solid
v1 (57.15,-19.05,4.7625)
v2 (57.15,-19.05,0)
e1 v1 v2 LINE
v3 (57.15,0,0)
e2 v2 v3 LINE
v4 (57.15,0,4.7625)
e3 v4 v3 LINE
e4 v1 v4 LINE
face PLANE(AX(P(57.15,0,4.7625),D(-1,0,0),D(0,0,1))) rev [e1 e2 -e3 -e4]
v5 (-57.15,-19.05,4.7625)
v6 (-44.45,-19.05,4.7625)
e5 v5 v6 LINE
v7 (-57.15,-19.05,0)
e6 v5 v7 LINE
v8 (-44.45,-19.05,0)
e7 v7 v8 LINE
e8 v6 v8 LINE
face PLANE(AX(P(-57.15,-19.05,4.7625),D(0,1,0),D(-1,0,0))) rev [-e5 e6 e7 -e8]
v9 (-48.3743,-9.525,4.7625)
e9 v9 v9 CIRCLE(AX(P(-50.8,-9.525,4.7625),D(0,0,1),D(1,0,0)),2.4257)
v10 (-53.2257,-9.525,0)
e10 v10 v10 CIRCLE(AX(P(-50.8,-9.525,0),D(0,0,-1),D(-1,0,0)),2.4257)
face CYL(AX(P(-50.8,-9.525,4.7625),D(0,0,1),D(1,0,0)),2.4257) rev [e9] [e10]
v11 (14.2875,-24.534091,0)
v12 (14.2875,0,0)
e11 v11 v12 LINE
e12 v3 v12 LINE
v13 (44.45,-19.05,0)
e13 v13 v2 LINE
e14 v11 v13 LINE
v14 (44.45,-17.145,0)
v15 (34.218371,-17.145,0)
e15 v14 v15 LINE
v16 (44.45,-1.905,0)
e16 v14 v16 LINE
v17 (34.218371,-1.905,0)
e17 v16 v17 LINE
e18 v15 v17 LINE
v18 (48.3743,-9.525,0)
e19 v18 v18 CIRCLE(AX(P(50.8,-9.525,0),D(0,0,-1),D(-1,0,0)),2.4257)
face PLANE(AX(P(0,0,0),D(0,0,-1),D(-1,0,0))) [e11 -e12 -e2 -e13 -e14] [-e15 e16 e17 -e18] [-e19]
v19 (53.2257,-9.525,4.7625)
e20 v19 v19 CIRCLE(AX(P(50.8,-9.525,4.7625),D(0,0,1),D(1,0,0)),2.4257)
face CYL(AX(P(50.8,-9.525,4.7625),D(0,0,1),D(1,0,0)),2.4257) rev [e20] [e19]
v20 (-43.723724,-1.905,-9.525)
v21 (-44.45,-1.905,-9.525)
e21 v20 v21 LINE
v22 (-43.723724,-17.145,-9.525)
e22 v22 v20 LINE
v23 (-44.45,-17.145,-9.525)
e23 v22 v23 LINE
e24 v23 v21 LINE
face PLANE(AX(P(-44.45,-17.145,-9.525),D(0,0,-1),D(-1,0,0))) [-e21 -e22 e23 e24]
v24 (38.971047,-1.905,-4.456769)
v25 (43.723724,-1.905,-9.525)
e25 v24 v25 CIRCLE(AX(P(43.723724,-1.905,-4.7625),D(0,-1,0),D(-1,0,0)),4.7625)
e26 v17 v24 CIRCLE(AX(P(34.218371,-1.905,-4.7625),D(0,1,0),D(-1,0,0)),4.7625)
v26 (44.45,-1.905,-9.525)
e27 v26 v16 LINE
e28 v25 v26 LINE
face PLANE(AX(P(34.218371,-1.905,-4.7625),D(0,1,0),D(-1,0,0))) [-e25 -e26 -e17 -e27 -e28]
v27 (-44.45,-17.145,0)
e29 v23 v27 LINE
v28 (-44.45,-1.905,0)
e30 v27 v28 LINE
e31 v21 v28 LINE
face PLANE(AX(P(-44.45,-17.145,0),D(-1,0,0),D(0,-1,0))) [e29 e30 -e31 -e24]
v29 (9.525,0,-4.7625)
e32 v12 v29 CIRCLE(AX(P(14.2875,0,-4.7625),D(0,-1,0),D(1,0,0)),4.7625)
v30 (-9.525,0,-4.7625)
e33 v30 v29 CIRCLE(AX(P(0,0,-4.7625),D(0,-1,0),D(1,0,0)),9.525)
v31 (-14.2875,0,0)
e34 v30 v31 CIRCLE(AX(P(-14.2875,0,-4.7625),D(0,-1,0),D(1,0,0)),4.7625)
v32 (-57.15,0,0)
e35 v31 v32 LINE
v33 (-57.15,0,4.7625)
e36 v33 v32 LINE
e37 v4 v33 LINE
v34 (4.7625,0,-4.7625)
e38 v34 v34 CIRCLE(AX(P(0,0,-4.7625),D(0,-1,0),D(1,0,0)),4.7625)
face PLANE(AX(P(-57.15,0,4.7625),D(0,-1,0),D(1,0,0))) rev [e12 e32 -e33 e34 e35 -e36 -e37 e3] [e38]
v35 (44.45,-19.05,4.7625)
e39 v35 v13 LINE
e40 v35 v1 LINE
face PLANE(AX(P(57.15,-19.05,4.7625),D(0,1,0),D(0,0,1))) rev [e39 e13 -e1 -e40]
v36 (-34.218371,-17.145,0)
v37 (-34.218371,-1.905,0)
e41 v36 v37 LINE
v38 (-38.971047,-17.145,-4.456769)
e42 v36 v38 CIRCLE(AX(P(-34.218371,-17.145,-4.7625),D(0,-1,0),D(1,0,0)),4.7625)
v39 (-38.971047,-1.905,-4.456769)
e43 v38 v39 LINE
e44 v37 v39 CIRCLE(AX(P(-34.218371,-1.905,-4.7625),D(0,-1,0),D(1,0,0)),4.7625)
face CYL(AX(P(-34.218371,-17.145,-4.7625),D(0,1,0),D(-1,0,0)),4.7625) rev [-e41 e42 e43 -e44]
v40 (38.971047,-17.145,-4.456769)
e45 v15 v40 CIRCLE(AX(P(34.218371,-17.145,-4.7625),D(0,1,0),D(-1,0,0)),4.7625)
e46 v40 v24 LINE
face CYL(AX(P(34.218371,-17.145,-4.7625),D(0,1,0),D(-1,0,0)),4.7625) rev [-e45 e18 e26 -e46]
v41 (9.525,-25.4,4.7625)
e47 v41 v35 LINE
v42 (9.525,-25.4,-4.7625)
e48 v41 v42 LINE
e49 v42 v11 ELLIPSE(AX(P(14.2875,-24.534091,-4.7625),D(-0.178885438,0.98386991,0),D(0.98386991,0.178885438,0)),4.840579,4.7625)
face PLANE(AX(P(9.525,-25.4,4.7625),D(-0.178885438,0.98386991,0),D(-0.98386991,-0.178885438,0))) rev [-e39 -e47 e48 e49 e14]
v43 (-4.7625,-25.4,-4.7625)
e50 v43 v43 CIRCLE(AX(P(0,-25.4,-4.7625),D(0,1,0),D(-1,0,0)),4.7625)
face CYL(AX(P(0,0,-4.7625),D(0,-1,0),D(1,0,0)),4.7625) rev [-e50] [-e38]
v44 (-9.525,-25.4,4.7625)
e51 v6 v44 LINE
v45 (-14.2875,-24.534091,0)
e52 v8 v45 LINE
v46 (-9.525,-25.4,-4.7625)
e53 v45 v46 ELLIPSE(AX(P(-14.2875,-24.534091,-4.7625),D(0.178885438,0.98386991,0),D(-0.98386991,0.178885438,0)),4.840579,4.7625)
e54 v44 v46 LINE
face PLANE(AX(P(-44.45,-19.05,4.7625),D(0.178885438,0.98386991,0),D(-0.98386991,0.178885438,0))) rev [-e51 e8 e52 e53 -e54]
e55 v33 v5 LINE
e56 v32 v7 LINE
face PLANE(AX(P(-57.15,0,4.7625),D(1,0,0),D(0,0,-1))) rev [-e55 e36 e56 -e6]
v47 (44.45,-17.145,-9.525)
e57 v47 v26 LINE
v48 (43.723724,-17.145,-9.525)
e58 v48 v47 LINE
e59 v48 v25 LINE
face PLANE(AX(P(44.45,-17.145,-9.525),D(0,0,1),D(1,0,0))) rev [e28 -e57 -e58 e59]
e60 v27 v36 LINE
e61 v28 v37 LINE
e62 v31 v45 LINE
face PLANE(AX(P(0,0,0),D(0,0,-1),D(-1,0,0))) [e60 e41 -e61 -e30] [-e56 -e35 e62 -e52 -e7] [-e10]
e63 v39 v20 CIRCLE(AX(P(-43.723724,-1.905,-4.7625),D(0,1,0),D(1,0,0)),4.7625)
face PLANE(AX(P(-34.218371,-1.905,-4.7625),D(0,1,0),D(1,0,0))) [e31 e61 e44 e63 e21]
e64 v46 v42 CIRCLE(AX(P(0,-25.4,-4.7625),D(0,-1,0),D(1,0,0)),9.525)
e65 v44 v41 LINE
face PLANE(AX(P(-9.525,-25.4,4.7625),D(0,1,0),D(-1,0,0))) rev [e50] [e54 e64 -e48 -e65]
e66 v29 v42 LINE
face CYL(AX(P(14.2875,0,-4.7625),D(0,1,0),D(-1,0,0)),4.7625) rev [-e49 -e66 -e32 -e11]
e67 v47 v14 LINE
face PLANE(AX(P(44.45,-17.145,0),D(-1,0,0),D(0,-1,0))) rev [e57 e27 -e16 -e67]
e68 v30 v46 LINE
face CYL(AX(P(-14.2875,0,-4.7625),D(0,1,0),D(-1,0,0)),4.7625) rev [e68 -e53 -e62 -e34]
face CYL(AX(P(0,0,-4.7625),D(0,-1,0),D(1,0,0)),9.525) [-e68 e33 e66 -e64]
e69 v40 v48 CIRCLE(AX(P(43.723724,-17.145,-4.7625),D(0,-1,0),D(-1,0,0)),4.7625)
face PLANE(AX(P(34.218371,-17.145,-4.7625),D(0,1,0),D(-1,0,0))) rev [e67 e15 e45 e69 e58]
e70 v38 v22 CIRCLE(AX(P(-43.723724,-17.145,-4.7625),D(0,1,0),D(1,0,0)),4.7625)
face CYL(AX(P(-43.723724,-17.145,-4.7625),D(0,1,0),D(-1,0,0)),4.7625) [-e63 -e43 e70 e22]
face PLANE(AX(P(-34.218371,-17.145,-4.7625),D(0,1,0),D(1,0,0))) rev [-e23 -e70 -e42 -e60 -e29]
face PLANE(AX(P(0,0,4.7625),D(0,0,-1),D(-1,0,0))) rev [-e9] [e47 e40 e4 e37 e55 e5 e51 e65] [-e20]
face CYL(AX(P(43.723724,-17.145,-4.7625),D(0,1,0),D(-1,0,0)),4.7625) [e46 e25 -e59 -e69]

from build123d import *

# Parameters (mm, degrees)
BOSS_EXTRUDE5_DEPTH         = 4.7625
F_11_0_191_DIAMETER_HOLE1_D = 4.8514
BOSS_EXTRUDE6_DEPTH         = 25.4
CUT_EXTRUDE1_DEPTH          = 65.15150159
CUT_EXTRUDE1_DEPTH_BACK     = 65.15150159
SKETCH7_R                   = 4.7625
FILLET2_R                   = 4.7625
BOSS_EXTRUDE7_DEPTH         = 7.62


with BuildPart() as part:
    # Sketch3 → Boss-Extrude5 (new body)
    with BuildSketch(Plane.XY):
        Polygon((-57.15, 0), (57.15, 0), (57.15, -19.05), (44.45, -19.05), (9.525, -25.4), (-9.525, -25.4), (-44.45, -19.05), (-57.15, -19.05), align=None)
    extrude(amount=BOSS_EXTRUDE5_DEPTH)

    # #11 (0.191) Diameter Hole1 (through all)
    with Locations(Plane(origin=(50.8, -9.525, 4.7625), x_dir=(1, 0, 0), z_dir=(0, 0, 1))):
        with Locations((0, 0), (-101.6, 0)):
            Hole(F_11_0_191_DIAMETER_HOLE1_D / 2)

    # Sketch6 → Boss-Extrude6 (add)
    with BuildSketch(Plane.XZ.offset(25.4)):
        with BuildLine():
            Line((9.525, 0), (9.525, -4.7625))
            ThreePointArc((9.525, -4.7625), (0, -14.2875), (-9.525, -4.7625))
            Line((-9.525, -4.7625), (-9.525, 0))
            Line((-9.525, 0), (9.525, 0))
        make_face()
    extrude(amount=-BOSS_EXTRUDE6_DEPTH)

    # Sketch7 → Cut-Extrude1 (cut, two sides: drawn at the far end of the back side and taken through both)
    with BuildSketch(Plane.XZ.offset(25.4).offset(-CUT_EXTRUDE1_DEPTH_BACK)):
        with Locations((0, -4.7625)):
            Circle(SKETCH7_R)
    extrude(amount=CUT_EXTRUDE1_DEPTH + CUT_EXTRUDE1_DEPTH_BACK, mode=Mode.SUBTRACT)

    # Fillet2
    fillet2_edges = [part.edges().sort_by_distance(p)[0] for p in [
        (-9.525, -12.7, 0),
        (9.525, -12.7, 0),
    ]]
    fillet(fillet2_edges, radius=FILLET2_R - 0.0001)  # a hair under: the kernel refuses the full size

    # Sketch8 → Boss-Extrude7 (add, symmetric)
    with BuildSketch(Plane(origin=(0, -9.525, 0), x_dir=(-1, 0, 0), z_dir=(0, -1, 0))):
        with BuildLine():
            Line((-44.45, 0), (-44.45, 9.525))
            Line((-44.45, 9.525), (-43.723723681, 9.525))
            ThreePointArc((-43.723723681, 9.525), (-40.249716578, 8.02021099), (-38.971047095, 4.45676888))
            ThreePointArc((-38.971047095, 4.45676888), (-37.476081499, 1.288492897), (-34.218370509, 0))
            Line((-34.218370509, 0), (-44.45, 0))
        make_face()
    boss_extrude7 = extrude(amount=BOSS_EXTRUDE7_DEPTH, both=True)

    # Mirror1: Boss-Extrude7 across plane
    add(boss_extrude7.mirror(Plane(origin=(0, 0, 0), x_dir=(0, 0, 1), z_dir=(1, 0, 0))))


solid = part.part
